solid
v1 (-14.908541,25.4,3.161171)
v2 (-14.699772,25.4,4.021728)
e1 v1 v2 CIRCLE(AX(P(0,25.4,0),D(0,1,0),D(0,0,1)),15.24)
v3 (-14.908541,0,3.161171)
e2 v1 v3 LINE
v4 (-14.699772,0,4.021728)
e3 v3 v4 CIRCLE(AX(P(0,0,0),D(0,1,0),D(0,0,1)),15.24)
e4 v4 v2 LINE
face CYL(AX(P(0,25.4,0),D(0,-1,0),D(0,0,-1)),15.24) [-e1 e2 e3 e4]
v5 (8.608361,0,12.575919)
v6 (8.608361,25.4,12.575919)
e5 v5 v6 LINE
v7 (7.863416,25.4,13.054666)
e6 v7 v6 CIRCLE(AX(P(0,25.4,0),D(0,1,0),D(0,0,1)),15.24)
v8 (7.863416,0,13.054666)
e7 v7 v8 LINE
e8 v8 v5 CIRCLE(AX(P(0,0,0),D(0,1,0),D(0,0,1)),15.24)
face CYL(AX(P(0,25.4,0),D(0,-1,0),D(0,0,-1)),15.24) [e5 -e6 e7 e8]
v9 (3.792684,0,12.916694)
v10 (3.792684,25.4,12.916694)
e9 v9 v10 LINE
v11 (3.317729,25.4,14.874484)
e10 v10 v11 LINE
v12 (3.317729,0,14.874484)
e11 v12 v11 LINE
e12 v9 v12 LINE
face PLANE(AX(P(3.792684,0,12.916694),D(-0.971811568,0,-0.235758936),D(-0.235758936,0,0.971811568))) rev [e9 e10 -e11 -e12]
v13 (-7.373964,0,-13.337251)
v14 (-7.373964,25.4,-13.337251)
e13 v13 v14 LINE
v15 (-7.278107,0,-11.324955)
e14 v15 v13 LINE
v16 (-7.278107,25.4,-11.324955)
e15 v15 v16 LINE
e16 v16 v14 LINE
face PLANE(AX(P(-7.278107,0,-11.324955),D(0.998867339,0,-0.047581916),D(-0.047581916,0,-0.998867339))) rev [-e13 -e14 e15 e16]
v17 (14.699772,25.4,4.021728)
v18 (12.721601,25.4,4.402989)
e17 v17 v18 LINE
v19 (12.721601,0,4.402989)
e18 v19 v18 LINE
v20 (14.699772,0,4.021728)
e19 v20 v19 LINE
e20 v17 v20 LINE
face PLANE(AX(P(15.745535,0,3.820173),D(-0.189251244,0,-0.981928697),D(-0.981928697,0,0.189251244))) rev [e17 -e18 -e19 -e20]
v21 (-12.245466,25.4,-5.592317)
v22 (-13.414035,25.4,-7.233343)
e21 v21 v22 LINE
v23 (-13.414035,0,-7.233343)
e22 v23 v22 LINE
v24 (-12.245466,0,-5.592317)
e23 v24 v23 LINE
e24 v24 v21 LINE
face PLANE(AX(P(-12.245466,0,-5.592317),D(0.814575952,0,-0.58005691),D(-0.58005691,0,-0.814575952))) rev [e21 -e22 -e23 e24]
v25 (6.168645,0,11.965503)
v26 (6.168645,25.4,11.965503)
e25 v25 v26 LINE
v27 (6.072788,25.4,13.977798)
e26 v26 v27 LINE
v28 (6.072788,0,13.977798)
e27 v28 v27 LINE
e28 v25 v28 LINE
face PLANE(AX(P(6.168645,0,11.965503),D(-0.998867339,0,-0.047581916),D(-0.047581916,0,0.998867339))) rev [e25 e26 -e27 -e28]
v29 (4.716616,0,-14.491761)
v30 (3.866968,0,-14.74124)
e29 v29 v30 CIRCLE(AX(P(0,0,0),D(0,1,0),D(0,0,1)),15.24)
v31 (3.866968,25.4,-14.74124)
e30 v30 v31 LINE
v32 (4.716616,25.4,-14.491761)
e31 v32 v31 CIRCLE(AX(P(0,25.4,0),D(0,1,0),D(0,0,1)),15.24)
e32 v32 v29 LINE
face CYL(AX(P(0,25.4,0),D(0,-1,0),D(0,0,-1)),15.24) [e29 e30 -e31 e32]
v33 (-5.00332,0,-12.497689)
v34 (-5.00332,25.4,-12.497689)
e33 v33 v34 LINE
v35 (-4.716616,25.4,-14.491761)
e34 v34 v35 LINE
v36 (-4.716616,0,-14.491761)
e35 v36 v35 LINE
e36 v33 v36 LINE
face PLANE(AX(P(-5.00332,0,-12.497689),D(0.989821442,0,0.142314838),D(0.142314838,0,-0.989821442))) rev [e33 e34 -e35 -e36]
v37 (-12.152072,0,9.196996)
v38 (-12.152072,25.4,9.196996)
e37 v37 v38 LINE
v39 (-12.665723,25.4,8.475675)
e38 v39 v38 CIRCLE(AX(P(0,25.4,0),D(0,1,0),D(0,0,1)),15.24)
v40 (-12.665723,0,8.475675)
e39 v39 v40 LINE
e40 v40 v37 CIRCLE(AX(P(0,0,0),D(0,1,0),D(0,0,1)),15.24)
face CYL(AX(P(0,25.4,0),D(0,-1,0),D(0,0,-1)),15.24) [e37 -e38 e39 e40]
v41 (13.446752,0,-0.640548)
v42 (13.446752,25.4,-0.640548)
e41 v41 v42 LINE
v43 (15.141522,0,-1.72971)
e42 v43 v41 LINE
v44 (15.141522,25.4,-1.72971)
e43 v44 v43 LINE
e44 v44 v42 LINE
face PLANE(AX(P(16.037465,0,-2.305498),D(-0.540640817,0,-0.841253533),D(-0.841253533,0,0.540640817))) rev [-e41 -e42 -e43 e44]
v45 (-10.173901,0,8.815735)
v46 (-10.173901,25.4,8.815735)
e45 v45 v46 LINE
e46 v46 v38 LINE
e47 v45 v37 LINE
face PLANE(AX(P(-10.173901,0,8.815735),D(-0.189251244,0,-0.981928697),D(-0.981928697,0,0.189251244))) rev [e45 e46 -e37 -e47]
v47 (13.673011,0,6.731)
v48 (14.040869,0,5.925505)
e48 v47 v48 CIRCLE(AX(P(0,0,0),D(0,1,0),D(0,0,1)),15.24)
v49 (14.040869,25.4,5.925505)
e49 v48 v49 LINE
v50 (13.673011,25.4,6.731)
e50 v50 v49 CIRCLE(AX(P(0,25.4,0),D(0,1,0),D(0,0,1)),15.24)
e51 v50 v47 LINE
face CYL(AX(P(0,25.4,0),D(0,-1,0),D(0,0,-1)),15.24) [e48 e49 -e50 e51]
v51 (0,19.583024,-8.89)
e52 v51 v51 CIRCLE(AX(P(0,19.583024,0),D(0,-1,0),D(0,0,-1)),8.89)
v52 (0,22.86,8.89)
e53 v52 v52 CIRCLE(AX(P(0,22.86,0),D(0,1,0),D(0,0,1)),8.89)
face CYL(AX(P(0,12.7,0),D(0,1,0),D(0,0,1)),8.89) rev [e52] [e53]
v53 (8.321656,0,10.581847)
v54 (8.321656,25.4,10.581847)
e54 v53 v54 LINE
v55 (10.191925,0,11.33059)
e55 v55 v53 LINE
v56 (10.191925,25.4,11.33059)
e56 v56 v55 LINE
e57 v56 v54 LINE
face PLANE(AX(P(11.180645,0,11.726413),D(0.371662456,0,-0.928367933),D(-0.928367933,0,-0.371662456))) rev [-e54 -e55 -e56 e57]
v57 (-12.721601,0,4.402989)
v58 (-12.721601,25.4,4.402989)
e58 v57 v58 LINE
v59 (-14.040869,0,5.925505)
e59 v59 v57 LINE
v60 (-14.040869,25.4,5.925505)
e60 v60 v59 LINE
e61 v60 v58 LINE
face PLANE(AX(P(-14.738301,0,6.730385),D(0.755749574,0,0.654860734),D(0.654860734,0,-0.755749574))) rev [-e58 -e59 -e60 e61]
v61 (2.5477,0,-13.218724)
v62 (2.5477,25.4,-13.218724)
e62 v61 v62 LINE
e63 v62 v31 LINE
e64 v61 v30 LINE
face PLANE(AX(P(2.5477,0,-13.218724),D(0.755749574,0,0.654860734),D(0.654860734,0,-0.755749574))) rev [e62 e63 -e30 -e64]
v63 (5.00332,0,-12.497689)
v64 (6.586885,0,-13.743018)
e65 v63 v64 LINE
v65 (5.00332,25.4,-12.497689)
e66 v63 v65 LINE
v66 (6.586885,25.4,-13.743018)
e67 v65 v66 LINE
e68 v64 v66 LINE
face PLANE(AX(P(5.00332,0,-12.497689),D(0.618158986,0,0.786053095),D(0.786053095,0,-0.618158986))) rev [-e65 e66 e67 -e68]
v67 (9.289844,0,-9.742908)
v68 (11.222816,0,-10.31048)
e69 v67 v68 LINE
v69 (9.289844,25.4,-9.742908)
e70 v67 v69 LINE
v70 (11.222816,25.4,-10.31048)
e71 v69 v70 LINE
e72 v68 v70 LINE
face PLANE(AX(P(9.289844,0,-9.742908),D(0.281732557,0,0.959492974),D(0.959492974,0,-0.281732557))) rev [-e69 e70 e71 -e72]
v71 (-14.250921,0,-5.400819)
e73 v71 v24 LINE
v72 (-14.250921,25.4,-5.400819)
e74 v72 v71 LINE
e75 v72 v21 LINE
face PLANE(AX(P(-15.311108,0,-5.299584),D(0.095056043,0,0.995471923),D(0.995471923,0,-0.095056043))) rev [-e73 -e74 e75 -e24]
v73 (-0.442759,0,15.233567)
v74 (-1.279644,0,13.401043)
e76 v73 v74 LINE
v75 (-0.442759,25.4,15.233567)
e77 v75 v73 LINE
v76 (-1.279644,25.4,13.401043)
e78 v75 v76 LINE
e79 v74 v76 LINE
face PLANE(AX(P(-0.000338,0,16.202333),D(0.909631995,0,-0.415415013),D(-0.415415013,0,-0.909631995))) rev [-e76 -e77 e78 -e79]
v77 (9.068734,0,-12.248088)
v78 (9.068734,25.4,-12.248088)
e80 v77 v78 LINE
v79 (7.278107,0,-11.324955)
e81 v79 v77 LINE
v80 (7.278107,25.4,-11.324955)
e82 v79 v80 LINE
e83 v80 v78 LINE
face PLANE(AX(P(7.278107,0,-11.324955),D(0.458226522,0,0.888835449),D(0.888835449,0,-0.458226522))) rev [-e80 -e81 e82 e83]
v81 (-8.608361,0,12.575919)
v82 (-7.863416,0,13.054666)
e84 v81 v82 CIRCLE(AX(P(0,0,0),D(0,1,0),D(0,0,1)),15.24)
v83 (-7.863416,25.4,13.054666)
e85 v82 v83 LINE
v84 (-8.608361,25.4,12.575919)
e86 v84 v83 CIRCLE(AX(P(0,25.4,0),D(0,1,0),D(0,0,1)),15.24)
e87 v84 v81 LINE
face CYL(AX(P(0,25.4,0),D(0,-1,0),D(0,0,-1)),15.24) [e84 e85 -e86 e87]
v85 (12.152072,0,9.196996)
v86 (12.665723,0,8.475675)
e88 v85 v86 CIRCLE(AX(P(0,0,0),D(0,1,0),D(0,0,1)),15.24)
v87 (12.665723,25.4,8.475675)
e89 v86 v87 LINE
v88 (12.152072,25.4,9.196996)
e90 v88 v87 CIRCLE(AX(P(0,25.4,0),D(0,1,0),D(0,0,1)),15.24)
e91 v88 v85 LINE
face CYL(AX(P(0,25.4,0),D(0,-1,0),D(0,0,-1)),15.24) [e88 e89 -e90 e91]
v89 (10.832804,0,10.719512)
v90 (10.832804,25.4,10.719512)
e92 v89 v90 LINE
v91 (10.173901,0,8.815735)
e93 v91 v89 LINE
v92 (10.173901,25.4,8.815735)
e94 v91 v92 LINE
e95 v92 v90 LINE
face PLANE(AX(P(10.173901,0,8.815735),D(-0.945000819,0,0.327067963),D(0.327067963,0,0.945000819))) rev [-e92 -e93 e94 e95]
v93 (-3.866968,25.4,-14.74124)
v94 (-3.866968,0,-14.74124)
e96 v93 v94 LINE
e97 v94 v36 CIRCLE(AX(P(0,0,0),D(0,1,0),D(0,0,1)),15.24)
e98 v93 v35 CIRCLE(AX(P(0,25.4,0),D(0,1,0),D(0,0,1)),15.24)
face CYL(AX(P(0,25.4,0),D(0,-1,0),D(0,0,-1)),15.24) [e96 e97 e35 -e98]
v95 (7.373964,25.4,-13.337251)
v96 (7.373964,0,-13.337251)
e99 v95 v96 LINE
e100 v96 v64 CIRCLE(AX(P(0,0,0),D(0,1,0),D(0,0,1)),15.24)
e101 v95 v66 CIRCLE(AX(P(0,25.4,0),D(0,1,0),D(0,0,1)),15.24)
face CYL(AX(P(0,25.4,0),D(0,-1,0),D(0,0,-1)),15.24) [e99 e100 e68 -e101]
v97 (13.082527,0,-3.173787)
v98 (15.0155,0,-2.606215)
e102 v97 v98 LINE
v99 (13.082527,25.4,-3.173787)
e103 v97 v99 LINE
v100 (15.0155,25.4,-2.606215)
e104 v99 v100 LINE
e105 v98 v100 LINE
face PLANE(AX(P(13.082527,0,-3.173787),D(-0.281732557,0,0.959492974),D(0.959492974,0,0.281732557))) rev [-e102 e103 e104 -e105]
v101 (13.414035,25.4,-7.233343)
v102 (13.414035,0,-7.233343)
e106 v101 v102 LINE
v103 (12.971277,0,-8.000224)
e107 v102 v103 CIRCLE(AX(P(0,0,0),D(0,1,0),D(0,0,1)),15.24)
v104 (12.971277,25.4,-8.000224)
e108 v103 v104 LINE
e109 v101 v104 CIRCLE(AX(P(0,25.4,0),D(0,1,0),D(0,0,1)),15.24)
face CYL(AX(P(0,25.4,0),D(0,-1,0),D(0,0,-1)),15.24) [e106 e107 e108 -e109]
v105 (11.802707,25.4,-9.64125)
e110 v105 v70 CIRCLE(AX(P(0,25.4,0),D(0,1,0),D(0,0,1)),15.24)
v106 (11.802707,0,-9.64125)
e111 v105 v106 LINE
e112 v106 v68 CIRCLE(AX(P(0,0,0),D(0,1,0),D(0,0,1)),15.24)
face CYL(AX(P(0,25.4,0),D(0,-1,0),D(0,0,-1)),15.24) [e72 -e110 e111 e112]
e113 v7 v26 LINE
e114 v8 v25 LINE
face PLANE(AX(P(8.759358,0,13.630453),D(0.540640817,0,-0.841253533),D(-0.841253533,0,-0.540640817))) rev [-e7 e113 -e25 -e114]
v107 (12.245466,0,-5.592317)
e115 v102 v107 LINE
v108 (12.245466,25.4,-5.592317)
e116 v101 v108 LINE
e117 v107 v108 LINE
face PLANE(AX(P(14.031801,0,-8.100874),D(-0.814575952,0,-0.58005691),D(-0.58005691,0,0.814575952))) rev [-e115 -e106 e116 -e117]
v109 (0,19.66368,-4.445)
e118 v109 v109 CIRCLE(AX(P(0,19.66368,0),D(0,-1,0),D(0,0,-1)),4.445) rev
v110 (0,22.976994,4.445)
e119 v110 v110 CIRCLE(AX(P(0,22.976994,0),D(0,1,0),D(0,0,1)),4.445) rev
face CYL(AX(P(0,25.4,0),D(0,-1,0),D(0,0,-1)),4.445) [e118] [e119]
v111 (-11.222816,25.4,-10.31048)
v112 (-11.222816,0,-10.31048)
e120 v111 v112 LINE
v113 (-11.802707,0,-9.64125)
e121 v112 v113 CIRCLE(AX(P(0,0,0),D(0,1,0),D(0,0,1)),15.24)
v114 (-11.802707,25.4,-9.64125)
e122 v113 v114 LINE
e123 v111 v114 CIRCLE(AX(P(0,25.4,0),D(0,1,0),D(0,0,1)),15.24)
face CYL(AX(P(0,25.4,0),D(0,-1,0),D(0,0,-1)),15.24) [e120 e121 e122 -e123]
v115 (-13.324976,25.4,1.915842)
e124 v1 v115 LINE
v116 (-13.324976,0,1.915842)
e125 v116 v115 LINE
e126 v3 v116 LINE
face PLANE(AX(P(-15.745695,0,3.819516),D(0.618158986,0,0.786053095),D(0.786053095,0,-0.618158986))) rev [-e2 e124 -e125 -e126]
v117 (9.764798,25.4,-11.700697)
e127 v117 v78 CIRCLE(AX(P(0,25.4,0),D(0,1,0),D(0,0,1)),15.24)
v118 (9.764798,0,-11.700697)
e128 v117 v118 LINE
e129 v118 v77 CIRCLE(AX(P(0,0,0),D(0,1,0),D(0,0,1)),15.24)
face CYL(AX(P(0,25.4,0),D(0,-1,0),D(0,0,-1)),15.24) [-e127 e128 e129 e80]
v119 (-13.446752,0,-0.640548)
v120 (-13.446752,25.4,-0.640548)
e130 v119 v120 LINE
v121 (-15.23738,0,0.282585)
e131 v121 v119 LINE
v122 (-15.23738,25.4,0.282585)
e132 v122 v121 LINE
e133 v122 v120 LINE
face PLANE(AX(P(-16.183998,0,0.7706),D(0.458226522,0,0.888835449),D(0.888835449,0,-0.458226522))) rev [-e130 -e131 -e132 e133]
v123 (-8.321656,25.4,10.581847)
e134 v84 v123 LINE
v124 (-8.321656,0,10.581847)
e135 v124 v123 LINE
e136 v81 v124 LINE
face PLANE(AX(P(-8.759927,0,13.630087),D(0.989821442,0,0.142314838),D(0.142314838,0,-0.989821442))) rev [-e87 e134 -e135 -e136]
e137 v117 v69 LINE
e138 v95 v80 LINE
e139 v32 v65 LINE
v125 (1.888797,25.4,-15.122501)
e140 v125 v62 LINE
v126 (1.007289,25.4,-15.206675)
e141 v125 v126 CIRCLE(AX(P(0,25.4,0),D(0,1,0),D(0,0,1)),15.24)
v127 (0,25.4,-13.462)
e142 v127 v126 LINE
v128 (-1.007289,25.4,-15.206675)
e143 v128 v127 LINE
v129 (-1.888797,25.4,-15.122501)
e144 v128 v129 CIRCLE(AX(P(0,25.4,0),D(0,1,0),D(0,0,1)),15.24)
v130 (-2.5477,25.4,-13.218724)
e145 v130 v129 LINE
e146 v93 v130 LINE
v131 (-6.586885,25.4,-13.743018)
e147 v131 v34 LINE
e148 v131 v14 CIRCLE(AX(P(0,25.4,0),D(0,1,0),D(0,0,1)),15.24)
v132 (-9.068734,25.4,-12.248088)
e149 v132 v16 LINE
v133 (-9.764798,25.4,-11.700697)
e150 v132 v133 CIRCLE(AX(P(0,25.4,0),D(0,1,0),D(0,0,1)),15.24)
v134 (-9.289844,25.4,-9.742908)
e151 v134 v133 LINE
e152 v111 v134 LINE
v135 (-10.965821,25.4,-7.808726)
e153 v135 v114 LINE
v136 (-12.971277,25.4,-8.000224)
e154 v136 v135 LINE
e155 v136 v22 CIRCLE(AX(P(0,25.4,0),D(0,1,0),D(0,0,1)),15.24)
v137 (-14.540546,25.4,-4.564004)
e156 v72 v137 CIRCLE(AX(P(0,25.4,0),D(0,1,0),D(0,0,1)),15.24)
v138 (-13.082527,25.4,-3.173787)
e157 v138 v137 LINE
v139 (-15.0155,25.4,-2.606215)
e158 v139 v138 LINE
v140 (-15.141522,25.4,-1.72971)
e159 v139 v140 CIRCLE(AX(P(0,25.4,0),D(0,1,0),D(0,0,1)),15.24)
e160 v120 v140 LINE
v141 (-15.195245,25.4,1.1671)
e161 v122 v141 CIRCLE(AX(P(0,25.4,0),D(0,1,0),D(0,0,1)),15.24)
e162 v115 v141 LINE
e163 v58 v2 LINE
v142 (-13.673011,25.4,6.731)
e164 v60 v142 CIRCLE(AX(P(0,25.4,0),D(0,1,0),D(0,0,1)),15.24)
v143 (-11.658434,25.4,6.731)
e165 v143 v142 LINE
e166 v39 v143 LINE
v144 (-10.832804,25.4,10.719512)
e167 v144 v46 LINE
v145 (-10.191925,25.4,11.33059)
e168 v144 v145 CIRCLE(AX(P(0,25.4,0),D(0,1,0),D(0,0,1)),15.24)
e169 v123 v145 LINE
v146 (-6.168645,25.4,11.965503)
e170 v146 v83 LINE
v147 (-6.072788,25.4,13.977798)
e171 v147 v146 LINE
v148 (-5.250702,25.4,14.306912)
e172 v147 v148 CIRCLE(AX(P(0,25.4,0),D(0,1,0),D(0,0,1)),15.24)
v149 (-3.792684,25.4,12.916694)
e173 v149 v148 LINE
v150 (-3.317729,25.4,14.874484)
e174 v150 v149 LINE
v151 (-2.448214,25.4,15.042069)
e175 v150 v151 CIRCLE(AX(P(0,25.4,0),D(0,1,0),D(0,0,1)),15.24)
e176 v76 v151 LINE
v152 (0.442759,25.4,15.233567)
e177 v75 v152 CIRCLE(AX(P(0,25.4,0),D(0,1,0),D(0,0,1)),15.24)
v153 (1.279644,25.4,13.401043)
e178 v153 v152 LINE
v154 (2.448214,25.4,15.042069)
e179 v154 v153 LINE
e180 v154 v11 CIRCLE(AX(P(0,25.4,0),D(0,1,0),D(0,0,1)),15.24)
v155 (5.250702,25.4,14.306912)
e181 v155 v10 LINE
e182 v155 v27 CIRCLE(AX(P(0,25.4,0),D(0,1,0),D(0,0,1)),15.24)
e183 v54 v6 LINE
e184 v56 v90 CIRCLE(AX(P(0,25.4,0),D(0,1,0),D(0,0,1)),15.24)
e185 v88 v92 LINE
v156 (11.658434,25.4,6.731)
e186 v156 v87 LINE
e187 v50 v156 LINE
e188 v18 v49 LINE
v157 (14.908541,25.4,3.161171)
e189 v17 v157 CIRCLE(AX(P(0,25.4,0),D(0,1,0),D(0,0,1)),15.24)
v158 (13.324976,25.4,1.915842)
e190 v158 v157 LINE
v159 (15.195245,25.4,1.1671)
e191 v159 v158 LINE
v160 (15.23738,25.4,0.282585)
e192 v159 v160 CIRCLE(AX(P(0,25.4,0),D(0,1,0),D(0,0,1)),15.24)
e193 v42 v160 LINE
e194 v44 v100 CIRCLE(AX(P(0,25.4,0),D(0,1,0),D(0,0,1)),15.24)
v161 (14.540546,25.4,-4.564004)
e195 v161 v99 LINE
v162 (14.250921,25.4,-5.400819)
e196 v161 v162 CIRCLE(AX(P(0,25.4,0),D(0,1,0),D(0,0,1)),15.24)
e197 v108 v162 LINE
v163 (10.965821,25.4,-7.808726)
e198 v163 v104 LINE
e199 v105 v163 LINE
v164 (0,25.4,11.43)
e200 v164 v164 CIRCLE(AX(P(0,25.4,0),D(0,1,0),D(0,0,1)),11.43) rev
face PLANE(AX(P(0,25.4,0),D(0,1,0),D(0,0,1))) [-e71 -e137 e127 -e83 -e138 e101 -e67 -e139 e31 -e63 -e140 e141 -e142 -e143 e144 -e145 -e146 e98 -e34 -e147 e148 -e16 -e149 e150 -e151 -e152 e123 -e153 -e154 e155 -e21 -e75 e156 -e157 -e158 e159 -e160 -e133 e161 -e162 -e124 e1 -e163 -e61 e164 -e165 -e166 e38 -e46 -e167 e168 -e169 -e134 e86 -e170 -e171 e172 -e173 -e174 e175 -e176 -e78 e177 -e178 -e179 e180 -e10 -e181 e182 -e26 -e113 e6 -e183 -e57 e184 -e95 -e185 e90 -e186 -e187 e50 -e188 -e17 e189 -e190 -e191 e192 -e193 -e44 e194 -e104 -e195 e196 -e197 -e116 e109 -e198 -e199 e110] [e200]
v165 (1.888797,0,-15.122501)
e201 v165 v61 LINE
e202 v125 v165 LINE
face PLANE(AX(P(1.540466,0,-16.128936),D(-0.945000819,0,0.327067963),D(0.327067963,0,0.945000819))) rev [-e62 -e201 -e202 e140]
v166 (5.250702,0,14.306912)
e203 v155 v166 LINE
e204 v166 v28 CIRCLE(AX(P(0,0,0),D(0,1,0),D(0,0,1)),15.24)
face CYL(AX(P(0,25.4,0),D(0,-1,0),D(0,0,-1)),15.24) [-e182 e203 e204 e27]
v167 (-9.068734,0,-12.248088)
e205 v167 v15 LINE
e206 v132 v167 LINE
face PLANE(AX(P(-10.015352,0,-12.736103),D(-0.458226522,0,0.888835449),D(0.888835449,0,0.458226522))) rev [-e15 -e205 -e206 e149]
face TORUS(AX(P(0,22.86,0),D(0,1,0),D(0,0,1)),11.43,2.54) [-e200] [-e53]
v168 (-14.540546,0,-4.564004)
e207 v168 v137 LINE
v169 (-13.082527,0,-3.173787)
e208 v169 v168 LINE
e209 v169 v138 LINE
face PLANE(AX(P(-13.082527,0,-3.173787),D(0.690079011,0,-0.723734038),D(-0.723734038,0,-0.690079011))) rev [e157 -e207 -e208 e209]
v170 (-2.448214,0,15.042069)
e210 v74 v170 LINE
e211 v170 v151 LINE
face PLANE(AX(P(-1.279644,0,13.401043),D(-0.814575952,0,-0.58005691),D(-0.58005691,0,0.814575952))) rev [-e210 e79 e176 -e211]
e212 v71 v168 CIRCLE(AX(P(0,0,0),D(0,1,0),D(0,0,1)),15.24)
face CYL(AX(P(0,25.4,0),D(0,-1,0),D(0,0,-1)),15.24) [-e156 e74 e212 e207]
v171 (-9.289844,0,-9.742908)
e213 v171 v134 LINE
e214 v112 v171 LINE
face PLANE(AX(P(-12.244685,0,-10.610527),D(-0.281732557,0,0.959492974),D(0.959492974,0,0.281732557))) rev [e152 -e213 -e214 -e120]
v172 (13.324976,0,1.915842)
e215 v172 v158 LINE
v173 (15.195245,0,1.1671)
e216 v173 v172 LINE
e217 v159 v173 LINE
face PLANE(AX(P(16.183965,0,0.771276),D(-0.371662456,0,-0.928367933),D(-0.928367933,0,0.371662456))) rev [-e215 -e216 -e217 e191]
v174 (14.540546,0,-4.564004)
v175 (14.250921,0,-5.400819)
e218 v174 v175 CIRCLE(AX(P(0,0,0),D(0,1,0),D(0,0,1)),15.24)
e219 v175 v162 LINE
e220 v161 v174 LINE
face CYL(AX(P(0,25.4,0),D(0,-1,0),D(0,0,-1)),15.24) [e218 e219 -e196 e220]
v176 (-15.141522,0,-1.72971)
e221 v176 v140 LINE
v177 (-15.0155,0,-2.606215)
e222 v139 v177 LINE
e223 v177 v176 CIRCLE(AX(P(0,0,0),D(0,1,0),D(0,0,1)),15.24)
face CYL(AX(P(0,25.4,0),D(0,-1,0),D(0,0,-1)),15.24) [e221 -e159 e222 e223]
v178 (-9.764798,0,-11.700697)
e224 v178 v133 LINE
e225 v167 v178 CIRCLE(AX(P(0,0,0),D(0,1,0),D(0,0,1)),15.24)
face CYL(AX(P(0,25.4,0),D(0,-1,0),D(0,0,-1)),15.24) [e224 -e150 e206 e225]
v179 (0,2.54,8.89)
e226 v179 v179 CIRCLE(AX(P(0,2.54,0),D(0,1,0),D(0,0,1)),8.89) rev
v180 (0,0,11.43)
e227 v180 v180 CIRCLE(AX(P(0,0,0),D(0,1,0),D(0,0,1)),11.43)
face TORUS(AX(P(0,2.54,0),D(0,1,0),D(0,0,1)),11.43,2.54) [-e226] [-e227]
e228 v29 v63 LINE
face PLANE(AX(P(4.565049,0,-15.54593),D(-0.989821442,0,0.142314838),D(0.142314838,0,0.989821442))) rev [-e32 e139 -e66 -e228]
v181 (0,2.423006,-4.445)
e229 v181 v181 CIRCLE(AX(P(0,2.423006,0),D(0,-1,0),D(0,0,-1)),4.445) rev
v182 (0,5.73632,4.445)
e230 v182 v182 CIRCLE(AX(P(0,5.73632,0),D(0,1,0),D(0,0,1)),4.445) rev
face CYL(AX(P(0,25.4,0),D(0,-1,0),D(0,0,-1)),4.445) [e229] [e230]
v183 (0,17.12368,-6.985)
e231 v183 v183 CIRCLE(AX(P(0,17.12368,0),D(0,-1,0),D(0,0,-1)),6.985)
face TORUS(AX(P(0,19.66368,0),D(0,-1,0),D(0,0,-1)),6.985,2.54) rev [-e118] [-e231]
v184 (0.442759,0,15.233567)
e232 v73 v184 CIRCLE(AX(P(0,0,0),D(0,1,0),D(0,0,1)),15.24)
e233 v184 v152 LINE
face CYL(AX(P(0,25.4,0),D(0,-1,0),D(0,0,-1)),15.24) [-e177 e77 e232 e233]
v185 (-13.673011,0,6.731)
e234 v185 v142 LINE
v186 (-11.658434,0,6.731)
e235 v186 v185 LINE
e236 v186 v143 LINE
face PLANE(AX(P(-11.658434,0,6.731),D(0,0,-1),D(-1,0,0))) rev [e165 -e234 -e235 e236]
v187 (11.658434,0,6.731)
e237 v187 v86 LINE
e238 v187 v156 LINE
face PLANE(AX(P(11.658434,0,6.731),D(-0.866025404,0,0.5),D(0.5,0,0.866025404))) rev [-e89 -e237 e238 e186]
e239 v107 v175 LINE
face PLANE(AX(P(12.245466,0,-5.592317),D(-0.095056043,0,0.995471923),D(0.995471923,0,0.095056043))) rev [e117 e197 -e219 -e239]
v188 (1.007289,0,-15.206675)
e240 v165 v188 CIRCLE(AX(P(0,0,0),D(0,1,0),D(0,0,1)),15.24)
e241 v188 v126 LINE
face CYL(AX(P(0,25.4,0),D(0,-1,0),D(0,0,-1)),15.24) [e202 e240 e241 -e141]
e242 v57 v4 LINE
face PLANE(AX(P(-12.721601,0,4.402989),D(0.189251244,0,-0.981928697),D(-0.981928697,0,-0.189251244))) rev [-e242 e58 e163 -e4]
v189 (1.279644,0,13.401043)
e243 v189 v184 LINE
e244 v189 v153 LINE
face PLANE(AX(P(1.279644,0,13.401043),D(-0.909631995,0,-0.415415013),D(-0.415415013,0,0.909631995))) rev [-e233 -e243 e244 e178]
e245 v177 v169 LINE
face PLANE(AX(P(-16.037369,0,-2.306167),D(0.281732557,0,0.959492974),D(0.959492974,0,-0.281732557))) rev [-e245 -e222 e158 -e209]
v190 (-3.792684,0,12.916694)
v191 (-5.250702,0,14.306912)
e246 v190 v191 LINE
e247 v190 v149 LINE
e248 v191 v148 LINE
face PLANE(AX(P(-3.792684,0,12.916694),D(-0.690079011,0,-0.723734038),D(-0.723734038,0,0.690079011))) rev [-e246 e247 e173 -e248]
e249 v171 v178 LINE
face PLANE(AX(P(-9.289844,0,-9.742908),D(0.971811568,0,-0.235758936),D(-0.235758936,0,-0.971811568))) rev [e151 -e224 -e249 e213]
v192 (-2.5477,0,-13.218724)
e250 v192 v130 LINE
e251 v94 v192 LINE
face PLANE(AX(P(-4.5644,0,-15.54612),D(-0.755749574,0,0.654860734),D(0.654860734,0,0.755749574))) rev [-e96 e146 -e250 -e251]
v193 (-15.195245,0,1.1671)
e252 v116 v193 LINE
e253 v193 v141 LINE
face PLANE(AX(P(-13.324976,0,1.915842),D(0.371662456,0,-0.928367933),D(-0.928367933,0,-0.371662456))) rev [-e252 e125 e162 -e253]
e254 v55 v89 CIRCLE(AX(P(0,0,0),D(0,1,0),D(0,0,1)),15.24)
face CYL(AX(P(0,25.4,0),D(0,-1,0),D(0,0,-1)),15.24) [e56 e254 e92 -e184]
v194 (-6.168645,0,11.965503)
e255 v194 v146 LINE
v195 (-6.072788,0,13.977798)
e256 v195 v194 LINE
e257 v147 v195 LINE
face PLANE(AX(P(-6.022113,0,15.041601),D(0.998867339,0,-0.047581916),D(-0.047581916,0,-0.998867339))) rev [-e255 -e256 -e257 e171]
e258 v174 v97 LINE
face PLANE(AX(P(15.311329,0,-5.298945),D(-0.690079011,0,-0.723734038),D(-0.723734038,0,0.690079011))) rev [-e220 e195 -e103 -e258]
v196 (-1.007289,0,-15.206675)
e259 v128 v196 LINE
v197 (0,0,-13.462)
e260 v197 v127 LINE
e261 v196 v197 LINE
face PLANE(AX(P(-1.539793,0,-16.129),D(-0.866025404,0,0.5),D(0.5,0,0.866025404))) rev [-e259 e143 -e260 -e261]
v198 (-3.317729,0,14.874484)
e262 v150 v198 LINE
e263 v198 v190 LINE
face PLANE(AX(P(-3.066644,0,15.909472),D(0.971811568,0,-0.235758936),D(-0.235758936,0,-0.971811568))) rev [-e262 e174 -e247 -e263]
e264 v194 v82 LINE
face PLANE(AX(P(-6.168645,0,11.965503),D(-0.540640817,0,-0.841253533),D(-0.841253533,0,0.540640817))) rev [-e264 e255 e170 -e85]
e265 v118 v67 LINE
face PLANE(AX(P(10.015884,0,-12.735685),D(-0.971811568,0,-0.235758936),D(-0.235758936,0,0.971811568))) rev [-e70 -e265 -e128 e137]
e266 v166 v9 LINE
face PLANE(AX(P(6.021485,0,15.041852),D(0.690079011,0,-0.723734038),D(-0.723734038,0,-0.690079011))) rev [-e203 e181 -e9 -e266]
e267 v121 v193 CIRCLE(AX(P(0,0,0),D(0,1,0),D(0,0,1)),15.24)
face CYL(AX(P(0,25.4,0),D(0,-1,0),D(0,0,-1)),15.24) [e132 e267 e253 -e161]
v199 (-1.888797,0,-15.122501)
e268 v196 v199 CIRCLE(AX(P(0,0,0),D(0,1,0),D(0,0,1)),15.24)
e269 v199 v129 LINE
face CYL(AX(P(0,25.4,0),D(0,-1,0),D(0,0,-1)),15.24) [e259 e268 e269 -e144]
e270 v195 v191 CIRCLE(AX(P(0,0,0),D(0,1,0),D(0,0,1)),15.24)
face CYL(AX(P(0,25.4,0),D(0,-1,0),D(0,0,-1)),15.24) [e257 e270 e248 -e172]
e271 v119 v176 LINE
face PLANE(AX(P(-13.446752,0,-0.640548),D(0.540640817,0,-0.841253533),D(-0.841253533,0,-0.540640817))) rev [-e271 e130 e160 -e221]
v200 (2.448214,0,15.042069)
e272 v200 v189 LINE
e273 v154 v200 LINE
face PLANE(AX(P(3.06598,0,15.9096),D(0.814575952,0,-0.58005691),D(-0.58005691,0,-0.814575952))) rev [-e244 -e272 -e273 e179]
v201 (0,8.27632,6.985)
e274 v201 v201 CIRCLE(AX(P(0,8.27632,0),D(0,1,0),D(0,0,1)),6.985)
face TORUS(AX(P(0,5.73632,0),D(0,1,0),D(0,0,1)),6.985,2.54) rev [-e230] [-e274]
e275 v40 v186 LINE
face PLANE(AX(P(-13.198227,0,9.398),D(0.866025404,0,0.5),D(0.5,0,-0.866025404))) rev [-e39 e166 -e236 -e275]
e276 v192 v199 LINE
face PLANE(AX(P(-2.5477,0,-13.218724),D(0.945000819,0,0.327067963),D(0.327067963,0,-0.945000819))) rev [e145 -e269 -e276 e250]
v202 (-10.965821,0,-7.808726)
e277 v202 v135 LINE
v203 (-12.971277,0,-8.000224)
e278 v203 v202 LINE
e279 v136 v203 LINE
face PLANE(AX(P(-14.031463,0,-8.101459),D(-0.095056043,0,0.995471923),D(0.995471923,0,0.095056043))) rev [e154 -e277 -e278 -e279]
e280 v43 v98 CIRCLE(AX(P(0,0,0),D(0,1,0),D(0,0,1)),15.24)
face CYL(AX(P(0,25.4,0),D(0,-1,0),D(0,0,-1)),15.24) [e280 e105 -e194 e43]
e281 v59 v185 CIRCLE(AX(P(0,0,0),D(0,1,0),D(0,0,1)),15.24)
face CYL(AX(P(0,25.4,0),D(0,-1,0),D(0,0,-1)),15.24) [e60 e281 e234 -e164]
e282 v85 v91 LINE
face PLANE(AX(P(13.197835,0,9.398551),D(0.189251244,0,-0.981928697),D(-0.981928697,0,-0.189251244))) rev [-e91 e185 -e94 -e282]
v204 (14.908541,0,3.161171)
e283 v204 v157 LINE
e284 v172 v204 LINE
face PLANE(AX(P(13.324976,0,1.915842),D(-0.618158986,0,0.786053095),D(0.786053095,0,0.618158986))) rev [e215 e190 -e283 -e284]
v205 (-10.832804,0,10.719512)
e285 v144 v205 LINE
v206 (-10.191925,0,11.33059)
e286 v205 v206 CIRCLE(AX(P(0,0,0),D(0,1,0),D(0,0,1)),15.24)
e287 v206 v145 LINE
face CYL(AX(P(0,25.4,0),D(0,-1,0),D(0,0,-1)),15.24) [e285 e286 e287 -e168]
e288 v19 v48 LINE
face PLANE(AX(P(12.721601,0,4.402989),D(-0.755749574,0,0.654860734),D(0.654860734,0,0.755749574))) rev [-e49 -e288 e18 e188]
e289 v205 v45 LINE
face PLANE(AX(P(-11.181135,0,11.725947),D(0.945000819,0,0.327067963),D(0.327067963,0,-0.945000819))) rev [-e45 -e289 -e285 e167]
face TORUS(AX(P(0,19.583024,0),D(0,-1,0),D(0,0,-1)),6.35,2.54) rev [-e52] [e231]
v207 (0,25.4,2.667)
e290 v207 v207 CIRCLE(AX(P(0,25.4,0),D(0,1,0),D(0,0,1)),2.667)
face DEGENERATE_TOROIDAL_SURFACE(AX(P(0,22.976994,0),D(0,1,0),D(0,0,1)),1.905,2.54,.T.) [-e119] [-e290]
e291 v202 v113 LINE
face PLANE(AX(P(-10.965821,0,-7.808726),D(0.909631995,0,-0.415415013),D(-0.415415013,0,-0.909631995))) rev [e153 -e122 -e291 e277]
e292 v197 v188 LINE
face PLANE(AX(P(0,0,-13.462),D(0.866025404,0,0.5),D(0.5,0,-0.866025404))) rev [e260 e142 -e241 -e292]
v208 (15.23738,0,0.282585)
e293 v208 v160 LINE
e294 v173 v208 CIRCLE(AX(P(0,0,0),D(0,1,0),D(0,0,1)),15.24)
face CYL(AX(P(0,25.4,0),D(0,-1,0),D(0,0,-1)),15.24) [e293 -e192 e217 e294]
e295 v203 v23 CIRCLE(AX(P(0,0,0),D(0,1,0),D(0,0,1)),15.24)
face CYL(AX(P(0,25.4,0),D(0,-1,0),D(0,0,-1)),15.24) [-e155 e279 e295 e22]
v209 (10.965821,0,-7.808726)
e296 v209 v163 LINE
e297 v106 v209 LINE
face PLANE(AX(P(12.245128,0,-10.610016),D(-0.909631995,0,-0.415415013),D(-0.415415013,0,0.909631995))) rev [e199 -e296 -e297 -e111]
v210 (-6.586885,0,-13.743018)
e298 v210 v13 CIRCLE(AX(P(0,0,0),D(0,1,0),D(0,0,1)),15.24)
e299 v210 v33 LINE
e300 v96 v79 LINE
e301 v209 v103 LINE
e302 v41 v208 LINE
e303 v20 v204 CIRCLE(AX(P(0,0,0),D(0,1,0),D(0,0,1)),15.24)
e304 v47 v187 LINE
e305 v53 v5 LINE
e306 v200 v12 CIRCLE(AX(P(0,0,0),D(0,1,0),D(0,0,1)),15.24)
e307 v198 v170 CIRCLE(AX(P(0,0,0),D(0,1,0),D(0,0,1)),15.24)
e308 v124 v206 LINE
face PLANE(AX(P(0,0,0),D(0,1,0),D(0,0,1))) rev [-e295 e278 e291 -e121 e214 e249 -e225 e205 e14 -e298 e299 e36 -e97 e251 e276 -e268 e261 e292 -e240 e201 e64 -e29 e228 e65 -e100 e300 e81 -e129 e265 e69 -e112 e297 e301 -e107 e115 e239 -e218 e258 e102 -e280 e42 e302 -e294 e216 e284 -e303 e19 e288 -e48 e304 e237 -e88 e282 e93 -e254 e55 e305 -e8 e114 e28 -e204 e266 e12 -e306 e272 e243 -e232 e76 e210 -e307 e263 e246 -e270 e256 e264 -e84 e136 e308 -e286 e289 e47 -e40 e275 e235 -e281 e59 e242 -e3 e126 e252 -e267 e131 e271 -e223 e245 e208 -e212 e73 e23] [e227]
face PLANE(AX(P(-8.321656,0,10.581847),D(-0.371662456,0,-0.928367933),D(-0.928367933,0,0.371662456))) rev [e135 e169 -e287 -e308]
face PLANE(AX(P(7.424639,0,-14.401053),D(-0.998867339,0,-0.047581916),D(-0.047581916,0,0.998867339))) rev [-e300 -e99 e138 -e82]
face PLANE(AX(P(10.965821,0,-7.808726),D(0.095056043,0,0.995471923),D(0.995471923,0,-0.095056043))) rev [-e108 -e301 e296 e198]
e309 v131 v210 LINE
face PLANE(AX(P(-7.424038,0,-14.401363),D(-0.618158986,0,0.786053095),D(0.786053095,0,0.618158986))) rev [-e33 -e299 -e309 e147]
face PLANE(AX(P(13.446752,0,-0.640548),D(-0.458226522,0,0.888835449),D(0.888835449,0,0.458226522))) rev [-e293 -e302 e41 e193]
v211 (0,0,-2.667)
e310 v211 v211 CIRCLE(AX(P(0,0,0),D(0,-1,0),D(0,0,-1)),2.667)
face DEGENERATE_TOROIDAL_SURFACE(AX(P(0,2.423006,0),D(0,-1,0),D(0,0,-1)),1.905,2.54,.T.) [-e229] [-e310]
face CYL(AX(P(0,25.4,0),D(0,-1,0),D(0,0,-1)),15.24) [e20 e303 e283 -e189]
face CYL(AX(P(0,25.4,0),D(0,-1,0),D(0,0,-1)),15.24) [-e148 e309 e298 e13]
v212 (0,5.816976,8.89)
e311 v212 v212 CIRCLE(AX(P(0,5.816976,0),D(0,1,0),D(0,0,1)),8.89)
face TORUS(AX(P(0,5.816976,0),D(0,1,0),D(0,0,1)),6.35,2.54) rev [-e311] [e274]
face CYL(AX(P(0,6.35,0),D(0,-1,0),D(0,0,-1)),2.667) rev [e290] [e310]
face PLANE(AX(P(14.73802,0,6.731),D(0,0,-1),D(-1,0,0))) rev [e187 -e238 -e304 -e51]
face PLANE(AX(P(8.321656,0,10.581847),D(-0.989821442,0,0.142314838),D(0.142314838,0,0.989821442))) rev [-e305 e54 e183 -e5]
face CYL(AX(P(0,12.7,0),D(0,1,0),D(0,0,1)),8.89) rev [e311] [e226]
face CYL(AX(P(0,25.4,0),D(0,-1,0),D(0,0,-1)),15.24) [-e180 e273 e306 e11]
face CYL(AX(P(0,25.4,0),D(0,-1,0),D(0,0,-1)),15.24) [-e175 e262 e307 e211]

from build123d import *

# Parameters (mm, degrees)
SKETCH1_R           = 15.24
BOSS_EXTRUDE1_DEPTH = 25.4
SKETCH2_R           = 2.667
CUT_EXTRUDE1_DEPTH  = 6.35
CUT_EXTRUDE2_START  = -25.4
CUT_EXTRUDE2_DEPTH  = 25.4
SKETCH4_R           = 8.89
CUT_EXTRUDE3_DEPTH  = 12.7
CUT_EXTRUDE7_START  = -25.4
SKETCH5_R           = 8.89
SKETCH5_R_2         = 4.445
CUT_EXTRUDE7_DEPTH  = 25.4
SKETCH6_R           = 2.667
CUT_EXTRUDE8_DEPTH  = 25.4
SKETCH7_R           = 4.445
SKETCH7_R_2         = 2.667
BOSS_EXTRUDE3_DEPTH = 12.7
SKETCH8_W           = 9.289209113
SKETCH8_H           = 8.847359644
SKETCH9_R           = 2.667
CUT_EXTRUDE9_DEPTH  = 12.7
FILLET1_R           = 2.54
FILLET2_R           = 2.54
FILLET3_R           = 2.54


with BuildPart() as part:
    # Sketch1 → Boss-Extrude1 (new body)
    with BuildSketch(Plane(origin=(0, 0, 0), x_dir=(1, 0, 0), z_dir=(0, 1, 0))):
        with Locations(Location((0, 0, 0), (0, 0, 270))):
            Circle(SKETCH1_R)
    extrude(amount=BOSS_EXTRUDE1_DEPTH)

    # Sketch2 → Cut-Extrude1 (cut)
    with BuildSketch(Plane(origin=(0, 0, 0), x_dir=(-1, 0, 0), z_dir=(0, -1, 0))):
        with Locations(Location((0, 0, 0), (0, 0, 90))):
            Circle(SKETCH2_R)
    extrude(amount=-CUT_EXTRUDE1_DEPTH, mode=Mode.SUBTRACT)

    # Cut-Extrude2: read off the stored shape, not the designer's step
    # Cut-Extrude2 outline → Cut-Extrude2 (cut)
    with BuildSketch(Plane(origin=(0, 25.4, 0), x_dir=(1, 0, 0), z_dir=(0, 1, 0)).offset(CUT_EXTRUDE2_START)):
        with BuildLine():
            ThreePointArc((1.007288675, 15.206675163), (0, 15.24), (-1.007288675, 15.206675163))
            Line((-1.007288675, 15.206675163), (0, 13.462))
            Line((0, 13.462), (1.007288675, 15.206675163))
        make_face()
        with BuildLine():
            Line((-2.547700252, 13.218724123), (-1.888796541, 15.122501368))
            ThreePointArc((-1.888796541, 15.122501368), (-2.884188964, 14.964593346), (-3.866967854, 14.741240098))
            Line((-3.866967854, 14.741240098), (-2.547700252, 13.218724123))
        make_face()
        with BuildLine():
            ThreePointArc((3.866967854, 14.741240098), (2.884188964, 14.964593346), (1.888796541, 15.122501368))
            Line((1.888796541, 15.122501368), (2.547700252, 13.218724123))
            Line((2.547700252, 13.218724123), (3.866967854, 14.741240098))
        make_face()
        with BuildLine():
            Line((-5.003319978, 12.497689114), (-4.716615728, 14.491760972))
            ThreePointArc((-4.716615728, 14.491760972), (-5.664135824, 14.148327299), (-6.586884739, 13.743018207))
            Line((-6.586884739, 13.743018207), (-5.003319978, 12.497689114))
        make_face()
        with BuildLine():
            ThreePointArc((6.586884739, 13.743018207), (5.664135824, 14.148327299), (4.716615728, 14.491760972))
            Line((4.716615728, 14.491760972), (5.003319978, 12.497689114))
            Line((5.003319978, 12.497689114), (6.586884739, 13.743018207))
        make_face()
        with BuildLine():
            Line((-7.278106685, 11.324955059), (-7.373964134, 13.337250577))
            ThreePointArc((-7.373964134, 13.337250577), (-8.239366058, 12.82070384), (-9.068734448, 12.248087831))
            Line((-9.068734448, 12.248087831), (-7.278106685, 11.324955059))
        make_face()
        with BuildLine():
            ThreePointArc((9.068734448, 12.248087831), (8.239366058, 12.82070384), (7.373964134, 13.337250577))
            Line((7.373964134, 13.337250577), (7.278106685, 11.324955059))
            Line((7.278106685, 11.324955059), (9.068734448, 12.248087831))
        make_face()
        with BuildLine():
            Line((-9.289843653, 9.742907621), (-9.764798264, 11.700697195))
            ThreePointArc((-9.764798264, 11.700697195), (-10.516804135, 11.029706741), (-11.222816465, 10.310479649))
            Line((-11.222816465, 10.310479649), (-9.289843653, 9.742907621))
        make_face()
        with BuildLine():
            ThreePointArc((11.222816465, 10.310479649), (10.516804135, 11.029706741), (9.764798264, 11.700697195))
            Line((9.764798264, 11.700697195), (9.289843653, 9.742907621))
            Line((9.289843653, 9.742907621), (11.222816465, 10.310479649))
        make_face()
        with BuildLine():
            Line((-10.965821466, 7.808726117), (-11.802707143, 9.641250132))
            ThreePointArc((-11.802707143, 9.641250132), (-12.414137509, 8.840067302), (-12.971276655, 8.000223869))
            Line((-12.971276655, 8.000223869), (-10.965821466, 7.808726117))
        make_face()
        with BuildLine():
            ThreePointArc((12.971276655, 8.000223869), (12.414137509, 8.840067302), (11.802707143, 9.641250132))
            Line((11.802707143, 9.641250132), (10.965821467, 7.808726117))
            Line((10.965821467, 7.808726117), (12.971276655, 8.000223869))
        make_face()
        with BuildLine():
            Line((-12.245465921, 5.592316905), (-13.414035433, 7.233343168))
            ThreePointArc((-13.414035433, 7.233343168), (-13.862791609, 6.330924798), (-14.25092111, 5.400819153))
            Line((-14.25092111, 5.400819153), (-12.245465921, 5.592316905))
        make_face()
        with BuildLine():
            ThreePointArc((14.25092111, 5.400819153), (13.862791609, 6.330924798), (13.414035433, 7.233343168))
            Line((13.414035433, 7.233343168), (12.245465921, 5.592316905))
            Line((12.245465921, 5.592316905), (14.25092111, 5.400819153))
        make_face()
        with BuildLine():
            Line((-13.082527333, 3.17378679), (-14.540545534, 4.564004336))
            ThreePointArc((-14.540545534, 4.564004336), (-14.810408301, 3.592966177), (-15.015500145, 2.606214762))
            Line((-15.015500145, 2.606214762), (-13.082527333, 3.17378679))
        make_face()
        with BuildLine():
            ThreePointArc((15.015500145, 2.606214762), (14.810408301, 3.592966177), (14.540545534, 4.564004336))
            Line((14.540545534, 4.564004336), (13.082527333, 3.17378679))
            Line((13.082527333, 3.17378679), (15.015500145, 2.606214762))
        make_face()
        with BuildLine():
            Line((-13.44675212, 0.640547751), (-15.141522433, 1.729710496))
            ThreePointArc((-15.141522433, 1.729710496), (-15.222738249, 0.725148397), (-15.237379883, -0.282585021))
            Line((-15.237379883, -0.282585021), (-13.44675212, 0.640547751))
        make_face()
        with BuildLine():
            ThreePointArc((15.237379883, -0.282585021), (15.222738249, 0.725148397), (15.141522433, 1.729710496))
            Line((15.141522433, 1.729710496), (13.44675212, 0.640547751))
            Line((13.44675212, 0.640547751), (15.237379883, -0.282585021))
        make_face()
        with BuildLine():
            Line((-13.324976251, -1.915842353), (-15.195245261, -1.167099588))
            ThreePointArc((-15.195245261, -1.167099588), (-15.084878774, -2.168878135), (-14.908541012, -3.161171445))
            Line((-14.908541012, -3.161171445), (-13.324976251, -1.915842353))
        make_face()
        with BuildLine():
            ThreePointArc((14.908541012, -3.161171445), (15.084878774, -2.168878135), (15.195245261, -1.167099588))
            Line((15.195245261, -1.167099588), (13.324976251, -1.915842353))
            Line((13.324976251, -1.915842353), (14.908541012, -3.161171445))
        make_face()
        with BuildLine():
            Line((-12.721601022, -4.402988922), (-14.699772335, -4.021727652))
            ThreePointArc((-14.699772335, -4.021727652), (-14.401812477, -4.984515761), (-14.040868624, -5.925504897))
            Line((-14.040868624, -5.925504897), (-12.721601022, -4.402988922))
        make_face()
        with BuildLine():
            ThreePointArc((14.040868624, -5.925504897), (14.401812477, -4.984515761), (14.699772335, -4.021727652))
            Line((14.699772335, -4.021727652), (12.721601022, -4.402988922))
            Line((12.721601022, -4.402988922), (14.040868624, -5.925504897))
        make_face()
        with BuildLine():
            Line((-11.658433986, -6.731), (-13.673011336, -6.731))
            ThreePointArc((-13.673011336, -6.731), (-13.198227154, -7.62), (-12.665722661, -8.475675163))
            Line((-12.665722661, -8.475675163), (-11.658433986, -6.731))
        make_face()
        with BuildLine():
            ThreePointArc((12.665722661, -8.475675163), (13.198227154, -7.62), (13.673011336, -6.731))
            Line((13.673011336, -6.731), (11.658433986, -6.731))
            Line((11.658433986, -6.731), (12.665722661, -8.475675163))
        make_face()
        with BuildLine():
            Line((-10.17390077, -8.8157352), (-12.152072083, -9.196996471))
            ThreePointArc((-12.152072083, -9.196996471), (-11.517623513, -9.980077585), (-10.832804481, -10.719512446))
            Line((-10.832804481, -10.719512446), (-10.17390077, -8.8157352))
        make_face()
        with BuildLine():
            ThreePointArc((10.832804481, -10.719512446), (11.517623513, -9.980077585), (12.152072083, -9.196996471))
            Line((12.152072083, -9.196996471), (10.17390077, -8.8157352))
            Line((10.17390077, -8.8157352), (10.832804481, -10.719512446))
        make_face()
        with BuildLine():
            Line((-8.321656272, -10.581846761), (-10.191925283, -11.330589527))
            ThreePointArc((-10.191925283, -11.330589527), (-9.42074295, -11.979449164), (-8.608360522, -12.575918619))
            Line((-8.608360522, -12.575918619), (-8.321656272, -10.581846761))
        make_face()
        with BuildLine():
            ThreePointArc((8.608360522, -12.575918619), (9.42074295, -11.979449164), (10.191925283, -11.330589527))
            Line((10.191925283, -11.330589527), (8.321656273, -10.581846761))
            Line((8.321656273, -10.581846761), (8.608360522, -12.575918619))
        make_face()
        with BuildLine():
            Line((-6.168645435, -11.96550281), (-7.863415749, -13.054665555))
            ThreePointArc((-7.863415749, -13.054665555), (-6.983372192, -13.545852237), (-6.072787986, -13.977798327))
            Line((-6.072787986, -13.977798327), (-6.168645435, -11.96550281))
        make_face()
        with BuildLine():
            ThreePointArc((6.072787986, -13.977798327), (6.983372192, -13.545852237), (7.863415749, -13.054665555))
            Line((7.863415749, -13.054665555), (6.168645436, -11.96550281))
            Line((6.168645436, -11.96550281), (6.072787986, -13.977798327))
        make_face()
        with BuildLine():
            Line((-3.79268368, -12.916694411), (-5.250701881, -14.306911957))
            ThreePointArc((-5.250701881, -14.306911957), (-4.293604167, -14.622672918), (-3.317729069, -14.874483985))
            Line((-3.317729069, -14.874483985), (-3.79268368, -12.916694411))
        make_face()
        with BuildLine():
            ThreePointArc((3.317729069, -14.874483985), (4.293604167, -14.622672918), (5.250701881, -14.306911957))
            Line((5.250701881, -14.306911957), (3.79268368, -12.916694411))
            Line((3.79268368, -12.916694411), (3.317729069, -14.874483985))
        make_face()
        with BuildLine():
            Line((-1.279644455, -13.401043022), (-2.448213967, -15.042069285))
            ThreePointArc((-2.448213967, -15.042069285), (-1.4486541, -15.1709921), (-0.442758779, -15.233567037))
            Line((-0.442758779, -15.233567037), (-1.279644455, -13.401043022))
        make_face()
        with BuildLine():
            ThreePointArc((0.442758779, -15.233567037), (1.4486541, -15.1709921), (2.448213967, -15.042069285))
            Line((2.448213967, -15.042069285), (1.279644455, -13.401043022))
            Line((1.279644455, -13.401043022), (0.442758779, -15.233567037))
        make_face()
    extrude(amount=CUT_EXTRUDE2_DEPTH, mode=Mode.SUBTRACT)

    # Sketch4 → Cut-Extrude3 (cut)
    with BuildSketch(Plane(origin=(0, 25.4, 0), x_dir=(1, 0, 0), z_dir=(0, 1, 0))):
        with Locations(Location((0, 0, 0), (0, 0, 270))):
            Circle(SKETCH4_R)
    extrude(amount=-CUT_EXTRUDE3_DEPTH, mode=Mode.SUBTRACT)

    # Sketch5 → Cut-Extrude7 (cut)
    with BuildSketch(Plane(origin=(0, 0, 0), x_dir=(-1, 0, 0), z_dir=(0, -1, 0)).offset(CUT_EXTRUDE7_START)):
        with Locations(Location((0, 0, 0), (0, 0, 270))):
            Circle(SKETCH5_R)
        with Locations(Location((0, 0, 0), (0, 0, 90))):
            Circle(SKETCH5_R_2, mode=Mode.SUBTRACT)
    extrude(amount=CUT_EXTRUDE7_DEPTH, mode=Mode.SUBTRACT)


with BuildPart() as cut_extrude7_piece_1:
    # of the separate pieces the step leaves, piece 1, a body of its own (cut_extrude7_pieces)
    add(part.part.solids().sort_by_distance((-0.442758779, 0, 15.233567037))[0])



with BuildPart() as cut_extrude7_piece_2:
    # of the separate pieces the step leaves, piece 2, a body of its own (cut_extrude7_pieces)
    add(part.part.solids().sort_by_distance((0, 0, -4.445))[0])

    # Sketch6 → Cut-Extrude8 (cut)
    with BuildSketch(Plane(origin=(0, 6.35, 0), x_dir=(-1, 0, 0), z_dir=(0, -1, 0))):
        with Locations(Location((0, 0, 0), (0, 0, 90))):
            Circle(SKETCH6_R)
    extrude(amount=-CUT_EXTRUDE8_DEPTH, mode=Mode.SUBTRACT)

    # Sketch7 → Boss-Extrude3 (add)
    with BuildSketch(Plane(origin=(0, 12.7, 0), x_dir=(1, 0, 0), z_dir=(0, 1, 0))):
        with Locations(Location((0, 0, 0), (0, 0, 90))):
            Circle(SKETCH7_R)
        with Locations(Location((0, 0, 0), (0, 0, 90))):
            Circle(SKETCH7_R_2, mode=Mode.SUBTRACT)
    extrude(amount=BOSS_EXTRUDE3_DEPTH)


with BuildPart() as cut_extrude7_piece_1_1:
    add(cut_extrude7_piece_1.part)

    add(cut_extrude7_piece_2.part)  # Revolve2 merges Cut-Extrude7 piece 2
    # Sketch8 → Revolve2 (revolve)
    with BuildSketch(Plane(origin=(0, 0, 0), x_dir=(0, 0, -1), z_dir=(1, 0, 0))):
        with Locations((4.644604557, 12.7)):
            Rectangle(SKETCH8_W, SKETCH8_H)
    revolve(axis=Axis((0, 17.123679822, 0), (0, -1, 0)))

    # Sketch9 → Cut-Extrude9 (cut)
    with BuildSketch(Plane(origin=(0, 17.123679822, 0), x_dir=(1, 0, 0), z_dir=(0, 1, 0))):
        with Locations(Location((0, 0, 0), (0, 0, 90))):
            Circle(SKETCH9_R)
    extrude(amount=-CUT_EXTRUDE9_DEPTH, mode=Mode.SUBTRACT)

    # Fillet1
    fillet1_edges = [cut_extrude7_piece_1_1.edges().sort_by_distance(p)[0] for p in [
        (0, 25.4, -8.89),
        (0, 0, -8.89),
        (0, 17.123679822, 4.445),
        (0, 8.276320178, 4.445),
    ]]
    fillet(fillet1_edges, radius=FILLET1_R)

    # Fillet2
    # the kernel refuses this fillet: 2.54 mm, written as the material it adds along each edge
    with BuildSketch(Plane(origin=(0, 17.123679822, 0), x_dir=(0, 0, 1), z_dir=(-1, 0, 0))) as fillet2_piece_1:
        with BuildLine():
            CenterArc((6.35, 2.459344425), FILLET2_R, 284.477512186, 75.522487814)
            Line((8.89, 2.459344425), (8.9408, 2.459344425))
            Line((8.9408, 2.459344425), (8.9408, 0))
            Line((8.9408, 0), (8.89, -0.0508))
            ThreePointArc((8.89, -0.0508), (7.9375, -0.0508), (6.9977, -0.049186888))
            Line((6.9977, -0.049186888), (6.985, 0))
        make_face()
    revolve(axis=Axis((0, 17.123679822, 0), (0, 1, 0)))
    with BuildSketch(Plane(origin=(0, 8.276320178, 0), x_dir=(0, 0, 1), z_dir=(-1, 0, 0))) as fillet2_piece_2:
        with BuildLine():
            CenterArc((6.35, -2.459344425), FILLET2_R, 0, 75.522487814)
            Line((8.89, -2.459344425), (8.9408, -2.459344425))
            Line((8.9408, -2.459344425), (8.9408, 0))
            Line((8.9408, 0), (8.89, 0.0508))
            ThreePointArc((8.89, 0.0508), (7.9375, 0.0508), (6.9977, 0.049186888))
            Line((6.9977, 0.049186888), (6.985, 0))
        make_face()
    revolve(axis=Axis((0, 8.276320178, 0), (0, 1, 0)))

    # Fillet3
    # the kernel refuses this fillet: 2.54 mm, written as the material it takes off along each edge
    with BuildSketch(Plane(origin=(0, 0, 0), x_dir=(0, 0, -1), z_dir=(-1, 0, 0))) as fillet3_piece_1:
        with BuildLine():
            CenterArc((1.905, -2.423005572), FILLET3_R, 0, 72.542396876)
            Line((2.667, 0), (2.68224, 0.048460111))
            ThreePointArc((2.68224, 0.048460111), (3.556, 0.0508), (4.445, 0.0508))
            Line((4.445, 0.0508), (4.4958, 0))
            Line((4.4958, 0), (4.4958, -2.423005572))
            Line((4.4958, -2.423005572), (4.445, -2.423005572))
        make_face()
    revolve(axis=Axis((0, 0, 0), (0, -1, 0)), mode=Mode.SUBTRACT)
    with BuildSketch(Plane(origin=(0, 25.4, 0), x_dir=(0, 0, -1), z_dir=(1, 0, 0))) as fillet3_piece_2:
        with BuildLine():
            CenterArc((1.905, -2.423005572), FILLET3_R, 0, 72.542396876)
            Line((4.445, -2.423005572), (4.4958, -2.423005572))
            Line((4.4958, -2.423005572), (4.4958, 0))
            Line((4.4958, 0), (4.445, 0.0508))
            ThreePointArc((4.445, 0.0508), (3.556, 0.0508), (2.68224, 0.048460111))
            Line((2.68224, 0.048460111), (2.667, 0))
        make_face()
    revolve(axis=Axis((0, 25.4, 0), (0, 1, 0)), mode=Mode.SUBTRACT)


solid = cut_extrude7_piece_1_1.part
